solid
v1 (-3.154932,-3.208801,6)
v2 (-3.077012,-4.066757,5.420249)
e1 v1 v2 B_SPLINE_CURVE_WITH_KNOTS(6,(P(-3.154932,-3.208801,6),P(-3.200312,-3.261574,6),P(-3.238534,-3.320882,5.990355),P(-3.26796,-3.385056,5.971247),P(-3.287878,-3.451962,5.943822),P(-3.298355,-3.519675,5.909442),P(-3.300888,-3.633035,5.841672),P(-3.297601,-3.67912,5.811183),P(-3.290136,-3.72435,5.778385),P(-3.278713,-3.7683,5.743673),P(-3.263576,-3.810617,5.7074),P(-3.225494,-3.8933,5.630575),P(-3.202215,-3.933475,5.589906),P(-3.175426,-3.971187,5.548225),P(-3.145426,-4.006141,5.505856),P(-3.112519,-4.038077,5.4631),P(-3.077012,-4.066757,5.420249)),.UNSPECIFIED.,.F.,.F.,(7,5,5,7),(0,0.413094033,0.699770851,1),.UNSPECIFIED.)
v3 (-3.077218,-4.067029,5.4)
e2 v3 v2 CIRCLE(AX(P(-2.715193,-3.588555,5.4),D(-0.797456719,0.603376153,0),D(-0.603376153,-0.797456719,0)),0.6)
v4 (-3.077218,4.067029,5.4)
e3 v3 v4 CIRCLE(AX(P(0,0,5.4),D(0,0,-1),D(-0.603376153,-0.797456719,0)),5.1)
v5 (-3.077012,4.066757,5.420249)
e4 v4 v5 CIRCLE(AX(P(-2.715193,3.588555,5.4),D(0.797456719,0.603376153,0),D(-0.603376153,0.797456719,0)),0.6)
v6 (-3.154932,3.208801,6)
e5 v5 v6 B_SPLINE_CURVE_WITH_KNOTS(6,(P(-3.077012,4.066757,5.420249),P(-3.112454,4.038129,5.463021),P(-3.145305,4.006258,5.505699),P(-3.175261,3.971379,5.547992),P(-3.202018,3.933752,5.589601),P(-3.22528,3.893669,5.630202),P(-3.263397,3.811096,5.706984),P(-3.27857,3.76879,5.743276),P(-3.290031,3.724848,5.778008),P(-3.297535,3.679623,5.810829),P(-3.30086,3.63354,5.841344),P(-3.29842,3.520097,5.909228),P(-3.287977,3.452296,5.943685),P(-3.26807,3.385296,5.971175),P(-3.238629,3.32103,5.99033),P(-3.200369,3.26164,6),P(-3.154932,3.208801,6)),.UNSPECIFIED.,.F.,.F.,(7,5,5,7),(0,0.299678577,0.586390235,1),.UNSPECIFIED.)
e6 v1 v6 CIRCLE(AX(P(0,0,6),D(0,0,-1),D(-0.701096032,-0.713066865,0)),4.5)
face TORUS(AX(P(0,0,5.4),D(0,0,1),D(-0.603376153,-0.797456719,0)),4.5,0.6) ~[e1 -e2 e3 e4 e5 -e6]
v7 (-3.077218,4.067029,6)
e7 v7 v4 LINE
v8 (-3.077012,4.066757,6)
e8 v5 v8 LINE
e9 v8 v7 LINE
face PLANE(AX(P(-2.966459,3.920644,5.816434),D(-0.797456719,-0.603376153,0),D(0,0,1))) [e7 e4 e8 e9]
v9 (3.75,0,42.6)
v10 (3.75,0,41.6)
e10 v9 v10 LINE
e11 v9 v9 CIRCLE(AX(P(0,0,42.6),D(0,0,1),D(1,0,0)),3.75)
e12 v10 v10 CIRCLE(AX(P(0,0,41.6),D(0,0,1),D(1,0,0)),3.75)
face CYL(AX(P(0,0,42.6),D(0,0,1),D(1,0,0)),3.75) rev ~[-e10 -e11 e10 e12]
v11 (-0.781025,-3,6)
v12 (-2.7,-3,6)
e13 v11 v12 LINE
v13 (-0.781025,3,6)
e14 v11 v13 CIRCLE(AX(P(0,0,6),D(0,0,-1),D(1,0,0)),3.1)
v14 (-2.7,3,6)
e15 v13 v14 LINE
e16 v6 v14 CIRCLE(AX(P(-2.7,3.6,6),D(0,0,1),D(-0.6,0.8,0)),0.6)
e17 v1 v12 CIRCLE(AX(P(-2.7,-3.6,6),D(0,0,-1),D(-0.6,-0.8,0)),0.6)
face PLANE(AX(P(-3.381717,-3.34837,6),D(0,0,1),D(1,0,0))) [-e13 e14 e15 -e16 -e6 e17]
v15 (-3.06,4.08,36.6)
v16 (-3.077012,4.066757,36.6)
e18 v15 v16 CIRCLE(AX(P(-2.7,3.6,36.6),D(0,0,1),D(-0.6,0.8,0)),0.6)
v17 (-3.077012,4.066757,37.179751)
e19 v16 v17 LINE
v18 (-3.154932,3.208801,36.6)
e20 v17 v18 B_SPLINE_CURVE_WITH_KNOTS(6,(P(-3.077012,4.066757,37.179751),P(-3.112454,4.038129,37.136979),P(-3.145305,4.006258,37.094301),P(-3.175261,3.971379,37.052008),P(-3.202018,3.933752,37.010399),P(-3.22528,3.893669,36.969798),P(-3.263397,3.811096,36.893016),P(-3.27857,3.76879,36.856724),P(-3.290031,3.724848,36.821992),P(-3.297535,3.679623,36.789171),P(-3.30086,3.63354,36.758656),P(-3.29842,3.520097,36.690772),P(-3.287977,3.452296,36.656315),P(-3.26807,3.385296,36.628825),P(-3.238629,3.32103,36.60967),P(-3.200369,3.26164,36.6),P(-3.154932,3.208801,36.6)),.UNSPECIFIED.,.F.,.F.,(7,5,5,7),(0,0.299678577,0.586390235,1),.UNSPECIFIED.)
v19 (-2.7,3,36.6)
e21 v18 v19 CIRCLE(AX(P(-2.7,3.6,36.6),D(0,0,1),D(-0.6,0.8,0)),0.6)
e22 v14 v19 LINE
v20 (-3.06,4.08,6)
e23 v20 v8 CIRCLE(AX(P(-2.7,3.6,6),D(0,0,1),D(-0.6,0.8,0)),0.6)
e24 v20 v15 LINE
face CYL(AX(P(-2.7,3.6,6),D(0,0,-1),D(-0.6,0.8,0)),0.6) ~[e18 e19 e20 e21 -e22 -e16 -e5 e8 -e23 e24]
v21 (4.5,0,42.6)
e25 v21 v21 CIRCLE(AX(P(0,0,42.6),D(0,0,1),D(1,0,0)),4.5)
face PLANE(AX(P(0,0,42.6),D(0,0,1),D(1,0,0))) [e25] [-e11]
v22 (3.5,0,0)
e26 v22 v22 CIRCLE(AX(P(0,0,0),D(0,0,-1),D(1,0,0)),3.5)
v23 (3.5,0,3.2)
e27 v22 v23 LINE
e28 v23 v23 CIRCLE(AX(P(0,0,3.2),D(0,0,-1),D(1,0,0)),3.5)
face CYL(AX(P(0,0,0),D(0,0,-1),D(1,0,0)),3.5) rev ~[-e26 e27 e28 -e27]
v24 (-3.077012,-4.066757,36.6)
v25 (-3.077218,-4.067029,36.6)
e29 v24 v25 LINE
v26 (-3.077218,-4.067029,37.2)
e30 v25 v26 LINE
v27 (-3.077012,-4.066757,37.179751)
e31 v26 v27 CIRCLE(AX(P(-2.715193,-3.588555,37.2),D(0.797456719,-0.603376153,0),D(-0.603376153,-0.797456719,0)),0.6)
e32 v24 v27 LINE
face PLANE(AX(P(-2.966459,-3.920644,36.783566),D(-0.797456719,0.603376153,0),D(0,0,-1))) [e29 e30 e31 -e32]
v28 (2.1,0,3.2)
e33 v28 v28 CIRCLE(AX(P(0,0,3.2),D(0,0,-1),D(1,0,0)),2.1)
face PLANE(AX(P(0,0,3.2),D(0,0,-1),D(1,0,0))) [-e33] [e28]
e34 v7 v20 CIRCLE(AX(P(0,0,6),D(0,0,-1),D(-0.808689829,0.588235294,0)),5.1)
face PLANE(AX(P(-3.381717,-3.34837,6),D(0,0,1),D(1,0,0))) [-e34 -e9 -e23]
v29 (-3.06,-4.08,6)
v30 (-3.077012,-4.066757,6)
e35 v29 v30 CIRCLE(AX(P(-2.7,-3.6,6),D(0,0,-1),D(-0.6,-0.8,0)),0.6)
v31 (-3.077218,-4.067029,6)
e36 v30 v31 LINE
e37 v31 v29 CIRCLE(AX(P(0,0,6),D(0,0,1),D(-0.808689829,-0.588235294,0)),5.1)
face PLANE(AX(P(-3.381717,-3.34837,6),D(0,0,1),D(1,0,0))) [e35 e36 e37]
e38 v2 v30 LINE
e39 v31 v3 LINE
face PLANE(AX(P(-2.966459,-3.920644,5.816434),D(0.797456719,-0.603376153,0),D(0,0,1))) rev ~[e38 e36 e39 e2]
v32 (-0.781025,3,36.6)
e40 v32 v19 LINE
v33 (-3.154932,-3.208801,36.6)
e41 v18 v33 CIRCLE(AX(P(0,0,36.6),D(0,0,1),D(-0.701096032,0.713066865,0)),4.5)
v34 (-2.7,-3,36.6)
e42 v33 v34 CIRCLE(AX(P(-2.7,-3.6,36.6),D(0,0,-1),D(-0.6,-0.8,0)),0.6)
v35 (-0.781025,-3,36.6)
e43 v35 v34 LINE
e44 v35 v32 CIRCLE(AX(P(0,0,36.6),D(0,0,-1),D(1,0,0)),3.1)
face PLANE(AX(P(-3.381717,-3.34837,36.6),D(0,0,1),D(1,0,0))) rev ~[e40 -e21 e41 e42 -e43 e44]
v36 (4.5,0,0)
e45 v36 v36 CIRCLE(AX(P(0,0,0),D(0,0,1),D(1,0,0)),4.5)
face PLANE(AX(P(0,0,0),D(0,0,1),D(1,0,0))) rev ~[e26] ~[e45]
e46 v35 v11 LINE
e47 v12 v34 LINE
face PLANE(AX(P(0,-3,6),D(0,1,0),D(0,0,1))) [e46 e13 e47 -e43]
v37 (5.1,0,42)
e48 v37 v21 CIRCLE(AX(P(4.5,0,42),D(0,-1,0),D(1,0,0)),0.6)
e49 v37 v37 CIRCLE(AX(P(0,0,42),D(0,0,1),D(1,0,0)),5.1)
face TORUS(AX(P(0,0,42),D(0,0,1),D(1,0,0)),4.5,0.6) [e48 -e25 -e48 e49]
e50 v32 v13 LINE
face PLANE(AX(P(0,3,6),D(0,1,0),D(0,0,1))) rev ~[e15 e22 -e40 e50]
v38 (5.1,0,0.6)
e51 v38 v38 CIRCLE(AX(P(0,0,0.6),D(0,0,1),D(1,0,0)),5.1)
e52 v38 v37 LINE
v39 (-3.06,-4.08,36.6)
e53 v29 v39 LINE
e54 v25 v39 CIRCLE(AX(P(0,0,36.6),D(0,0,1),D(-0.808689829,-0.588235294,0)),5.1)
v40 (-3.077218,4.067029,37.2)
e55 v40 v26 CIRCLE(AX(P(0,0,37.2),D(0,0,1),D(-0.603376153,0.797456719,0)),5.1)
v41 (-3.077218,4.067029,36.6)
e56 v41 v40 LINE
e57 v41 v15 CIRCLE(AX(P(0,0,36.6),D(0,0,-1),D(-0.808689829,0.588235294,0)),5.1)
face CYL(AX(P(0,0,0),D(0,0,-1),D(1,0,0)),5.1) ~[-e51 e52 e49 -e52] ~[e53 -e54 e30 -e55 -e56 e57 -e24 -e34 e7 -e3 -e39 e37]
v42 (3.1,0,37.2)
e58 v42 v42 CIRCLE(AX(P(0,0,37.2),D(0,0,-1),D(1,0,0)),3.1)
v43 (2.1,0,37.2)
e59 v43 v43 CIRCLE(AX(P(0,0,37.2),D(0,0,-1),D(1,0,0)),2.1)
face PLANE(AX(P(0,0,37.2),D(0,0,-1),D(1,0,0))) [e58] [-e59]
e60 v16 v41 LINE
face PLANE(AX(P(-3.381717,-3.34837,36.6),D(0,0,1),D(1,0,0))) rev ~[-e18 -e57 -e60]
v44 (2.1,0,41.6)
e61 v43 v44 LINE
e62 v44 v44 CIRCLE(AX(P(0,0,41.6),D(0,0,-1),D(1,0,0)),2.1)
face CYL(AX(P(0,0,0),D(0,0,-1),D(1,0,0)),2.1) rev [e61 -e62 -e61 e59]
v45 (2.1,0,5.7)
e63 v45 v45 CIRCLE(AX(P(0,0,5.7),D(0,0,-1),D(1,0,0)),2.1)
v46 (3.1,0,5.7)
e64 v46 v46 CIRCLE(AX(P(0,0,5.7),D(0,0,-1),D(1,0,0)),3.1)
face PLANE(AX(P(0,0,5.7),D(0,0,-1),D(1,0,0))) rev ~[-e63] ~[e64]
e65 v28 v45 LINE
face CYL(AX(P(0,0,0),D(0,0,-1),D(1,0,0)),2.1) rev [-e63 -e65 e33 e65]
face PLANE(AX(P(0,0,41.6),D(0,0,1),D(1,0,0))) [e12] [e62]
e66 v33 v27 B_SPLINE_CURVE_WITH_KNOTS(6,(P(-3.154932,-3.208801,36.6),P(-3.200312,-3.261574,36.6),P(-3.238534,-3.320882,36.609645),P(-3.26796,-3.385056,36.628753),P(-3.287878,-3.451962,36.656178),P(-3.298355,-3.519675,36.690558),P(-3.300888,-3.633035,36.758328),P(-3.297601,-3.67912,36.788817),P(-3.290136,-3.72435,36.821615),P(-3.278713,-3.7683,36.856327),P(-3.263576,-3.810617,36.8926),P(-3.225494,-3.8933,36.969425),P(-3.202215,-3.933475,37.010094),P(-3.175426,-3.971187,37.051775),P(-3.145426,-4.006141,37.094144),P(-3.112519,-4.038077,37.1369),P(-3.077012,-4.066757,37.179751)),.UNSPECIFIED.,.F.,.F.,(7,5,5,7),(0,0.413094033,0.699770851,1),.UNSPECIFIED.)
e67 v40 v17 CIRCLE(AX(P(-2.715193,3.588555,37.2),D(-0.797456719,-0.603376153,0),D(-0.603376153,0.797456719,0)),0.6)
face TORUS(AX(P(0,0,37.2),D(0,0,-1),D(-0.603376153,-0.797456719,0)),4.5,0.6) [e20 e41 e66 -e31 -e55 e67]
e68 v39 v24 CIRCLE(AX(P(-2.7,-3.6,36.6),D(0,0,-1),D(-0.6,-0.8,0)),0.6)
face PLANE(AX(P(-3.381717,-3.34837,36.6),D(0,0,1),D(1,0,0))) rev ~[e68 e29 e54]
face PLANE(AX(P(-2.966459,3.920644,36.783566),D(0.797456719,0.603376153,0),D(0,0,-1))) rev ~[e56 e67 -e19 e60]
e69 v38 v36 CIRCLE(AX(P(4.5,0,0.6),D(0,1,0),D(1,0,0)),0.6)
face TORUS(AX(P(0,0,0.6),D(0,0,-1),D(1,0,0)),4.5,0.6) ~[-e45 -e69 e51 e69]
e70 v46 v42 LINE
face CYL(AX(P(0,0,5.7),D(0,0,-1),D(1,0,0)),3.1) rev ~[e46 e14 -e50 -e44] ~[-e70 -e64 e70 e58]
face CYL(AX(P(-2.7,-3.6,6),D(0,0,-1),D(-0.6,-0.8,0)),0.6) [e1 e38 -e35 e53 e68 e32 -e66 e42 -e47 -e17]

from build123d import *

# Parameters (mm, degrees)
F0_R          = 5.1
F0_R_2        = 2.1
F1_DEPTH      = 42.6
F2_R          = 3.5
F3_DEPTH      = 3.2
F4_R          = 3.75
F5_DEPTH      = 1
F6_W          = 6
F6_H          = 30.6
F7_DEPTH      = 25
F9_START      = -2.5
F8_R          = 3.1
F9_DEPTH      = 31.5
F10_T1_DEPTH  = 30.6
F10_T10_ANGLE = 105.7758372511
F10_T16_ANGLE = 105.7758372511
F10_T23_DEPTH = 34.3907560857
F10_T27_ANGLE = 105.7758372511
F10_T34_ANGLE = 105.7758372511
F10_T38_DEPTH = 34.3907560857
F10_T45_DEPTH = 34.3907560857
F10_T49_ANGLE = 105.7758372511
F10_T56_DEPTH = 34.3907560857
F10_T60_ANGLE = 105.7758372511


# Not quite as in the source:
# - a fillet or chamfer that OpenCascade refuses, or shapes differently, is made with other operations: its cross-section is extruded or revolved along the edge and cut away or added


with BuildPart() as f1:
    # F0 (on Top) → F1 (new body)
    with BuildSketch(Plane.XY):
        Circle(F0_R)
        Circle(F0_R_2, mode=Mode.SUBTRACT)
    extrude(amount=F1_DEPTH)

    # F2 (on face) → F3 (cut)
    with BuildSketch(Plane(origin=(0, 0, 0), x_dir=(1, 0, 0), z_dir=(0, 0, -1))):
        Circle(F2_R)
    extrude(amount=-F3_DEPTH, mode=Mode.SUBTRACT)

    # F4 (on face) → F5 (cut)
    with BuildSketch(Plane.XY.offset(42.6)):
        Circle(F4_R)
    extrude(amount=-F5_DEPTH, mode=Mode.SUBTRACT)

    # F6 (on Right) → F7 (cut)
    with BuildSketch(Plane.YZ):
        with Locations((0, 21.3)):
            Rectangle(F6_W, F6_H)
    extrude(amount=-F7_DEPTH, mode=Mode.SUBTRACT)

    # F8 (on face) → F9 (cut)
    with BuildSketch(Plane(origin=(0, 0, 3.2), x_dir=(1, 0, 0), z_dir=(0, 0, -1)).offset(F9_START)):
        Circle(F8_R)
    extrude(amount=-F9_DEPTH, mode=Mode.SUBTRACT)

    # F10: fillet of radius 0.6 on 6 edges, made by hand

    # F10_s2 → F10_t1 (cut)
    with BuildSketch(Plane.XY.offset(6)):
        with BuildLine():
            ThreePointArc((-3.06, 4.08), (-3.2692099788, 3.4102633404), (-2.7, 3))
            Line((-2.7, 3), (-4.1243181255, 3))
            ThreePointArc((-4.1243181255, 3), (-3.6325207132, 3.5797755891), (-3.06, 4.08))
        make_face()
        with BuildLine():
            ThreePointArc((-3.06, -4.08), (-3.2692099788, -3.4102633404), (-2.7, -3))
            Line((-2.7, -3), (-4.1243181255, -3))
            ThreePointArc((-4.1243181255, -3), (-3.6325207132, -3.5797755891), (-3.06, -4.08))
        make_face()
    extrude(amount=F10_T1_DEPTH, mode=Mode.SUBTRACT)

    # F10_s3 → F10_t4 (revolve, cut)
    with BuildSketch(Plane.XZ):
        with BuildLine():
            ThreePointArc((5.1, 42), (4.9242640687, 42.4242640687), (4.5, 42.6))
            Line((4.5, 42.6), (5.1, 42.6))
            Line((5.1, 42.6), (5.1, 42))
        make_face()
    revolve(axis=Axis((0, 0, 42.6), (0, 0, 1)), mode=Mode.SUBTRACT)

    # F10_s5 → F10_t6 (revolve, cut)
    with BuildSketch(Plane.XZ):
        with BuildLine():
            ThreePointArc((5.1, 0.6), (4.9242640687, 0.1757359313), (4.5, 0))
            Line((4.5, 0), (5.1, 0))
            Line((5.1, 0), (5.1, 0.6))
        make_face()
    revolve(axis=Axis((0, 0, 0), (0, 0, 1)), mode=Mode.SUBTRACT)


with BuildPart() as f10_tool8:
    # F10_s9 → F10_t10 (revolve)
    with BuildSketch(Plane(origin=(0, 0, 0), x_dir=(0, 0, 1), z_dir=(0.7974567188, -0.6033761527, 0))):
        with BuildLine():
            ThreePointArc((5.4, 5.1), (5.8242640687, 4.9242640687), (6, 4.5))
            Line((6, 4.5), (6, 5.1))
            Line((6, 5.1), (5.4, 5.1))
        make_face()
    revolve(axis=Axis((0, 0, 6), (0, 0, -1)), revolution_arc=F10_T10_ANGLE)

    split(bisect_by=Plane.XZ.offset(3), keep=Keep.BOTTOM)

    split(bisect_by=Plane.XZ.offset(-3), keep=Keep.TOP)


with BuildPart() as f1_1:
    add(f1.part)

    # F10_t7: cut F10_tool8
    add(f10_tool8.part, mode=Mode.SUBTRACT)


with BuildPart() as f10_tool14:
    # F10_s15 → F10_t16 (revolve)
    with BuildSketch(Plane(origin=(0, 0, 0), x_dir=(0, 0, 1), z_dir=(0.7974567188, -0.6033761527, 0))):
        with BuildLine():
            ThreePointArc((37.2, 5.1), (36.7757359313, 4.9242640687), (36.6, 4.5))
            Line((36.6, 4.5), (36.6, 5.1))
            Line((36.6, 5.1), (37.2, 5.1))
        make_face()
    revolve(axis=Axis((0, 0, 36.6), (0, 0, -1)), revolution_arc=F10_T16_ANGLE)

    split(bisect_by=Plane.XZ.offset(3), keep=Keep.BOTTOM)

    split(bisect_by=Plane.XZ.offset(-3), keep=Keep.TOP)


with BuildPart() as f1_2:
    add(f1_1.part)

    # F10_t13: cut F10_tool14
    add(f10_tool14.part, mode=Mode.SUBTRACT)


with BuildPart() as f10_tool21:
    # F10_s22 → F10_t23 (new body)
    with BuildSketch(Plane.XY.offset(36.6)):
        with BuildLine():
            ThreePointArc((-3.06, -4.08), (-3.2692099788, -3.4102633404), (-2.7, -3))
            Line((-2.7, -3), (-4.1243181255, -3))
            ThreePointArc((-4.1243181255, -3), (-3.6325207132, -3.5797755891), (-3.06, -4.08))
        make_face()
    extrude(amount=-F10_T23_DEPTH)

    split(bisect_by=Plane.XY.offset(6), keep=Keep.BOTTOM)


with BuildPart() as f10_tool25:
    # F10_s26 → F10_t27 (revolve)
    with BuildSketch(Plane(origin=(0, 0, 0), x_dir=(0, 0, 1), z_dir=(0.7974567188, -0.6033761527, 0))):
        with BuildLine():
            ThreePointArc((5.4, 5.1), (5.8242640687, 4.9242640687), (6, 4.5))
            Line((6, 4.5), (6, 5.1))
            Line((6, 5.1), (5.4, 5.1))
        make_face()
    revolve(axis=Axis((0, 0, 6), (0, 0, -1)), revolution_arc=F10_T27_ANGLE)

    split(bisect_by=Plane.XZ.offset(3), keep=Keep.TOP)


with BuildPart() as f10_tool21_1:
    add(f10_tool21.part)

    # F10_t29: intersect F10_tool25
    add(f10_tool25.part, mode=Mode.INTERSECT)


with BuildPart() as f1_3:
    add(f1_2.part)

    # F10_t19: cut F10_tool21
    add(f10_tool21_1.part, mode=Mode.SUBTRACT)


with BuildPart() as f10_tool32:
    # F10_s33 → F10_t34 (revolve)
    with BuildSketch(Plane(origin=(0, 0, 0), x_dir=(0, 0, 1), z_dir=(0.7974567188, -0.6033761527, 0))):
        with BuildLine():
            ThreePointArc((5.4, 5.1), (5.8242640687, 4.9242640687), (6, 4.5))
            Line((6, 4.5), (6, 5.1))
            Line((6, 5.1), (5.4, 5.1))
        make_face()
    revolve(axis=Axis((0, 0, 6), (0, 0, -1)), revolution_arc=F10_T34_ANGLE)

    split(bisect_by=Plane.XZ.offset(-3), keep=Keep.BOTTOM)


with BuildPart() as f10_tool36:
    # F10_s37 → F10_t38 (new body)
    with BuildSketch(Plane.XY.offset(36.6)):
        with BuildLine():
            ThreePointArc((-3.06, 4.08), (-3.2692099788, 3.4102633404), (-2.7, 3))
            Line((-2.7, 3), (-4.1243181255, 3))
            ThreePointArc((-4.1243181255, 3), (-3.6325207132, 3.5797755891), (-3.06, 4.08))
        make_face()
    extrude(amount=-F10_T38_DEPTH)

    split(bisect_by=Plane.XY.offset(6), keep=Keep.BOTTOM)


with BuildPart() as f10_tool32_1:
    add(f10_tool32.part)

    # F10_t40: intersect F10_tool36
    add(f10_tool36.part, mode=Mode.INTERSECT)


with BuildPart() as f1_4:
    add(f1_3.part)

    # F10_t30: cut F10_tool32
    add(f10_tool32_1.part, mode=Mode.SUBTRACT)


with BuildPart() as f10_tool43:
    # F10_s44 → F10_t45 (new body)
    with BuildSketch(Plane.XY.offset(40.3907560857)):
        with BuildLine():
            ThreePointArc((-3.06, 4.08), (-3.2692099788, 3.4102633404), (-2.7, 3))
            Line((-2.7, 3), (-4.1243181255, 3))
            ThreePointArc((-4.1243181255, 3), (-3.6325207132, 3.5797755891), (-3.06, 4.08))
        make_face()
    extrude(amount=-F10_T45_DEPTH)

    split(bisect_by=Plane.XY.offset(36.6), keep=Keep.TOP)


with BuildPart() as f10_tool47:
    # F10_s48 → F10_t49 (revolve)
    with BuildSketch(Plane(origin=(0, 0, 0), x_dir=(0, 0, 1), z_dir=(0.7974567188, -0.6033761527, 0))):
        with BuildLine():
            ThreePointArc((37.2, 5.1), (36.7757359313, 4.9242640687), (36.6, 4.5))
            Line((36.6, 4.5), (36.6, 5.1))
            Line((36.6, 5.1), (37.2, 5.1))
        make_face()
    revolve(axis=Axis((0, 0, 36.6), (0, 0, -1)), revolution_arc=F10_T49_ANGLE)

    split(bisect_by=Plane.XZ.offset(-3), keep=Keep.BOTTOM)


with BuildPart() as f10_tool43_1:
    add(f10_tool43.part)

    # F10_t51: intersect F10_tool47
    add(f10_tool47.part, mode=Mode.INTERSECT)


with BuildPart() as f1_5:
    add(f1_4.part)

    # F10_t41: cut F10_tool43
    add(f10_tool43_1.part, mode=Mode.SUBTRACT)


with BuildPart() as f10_tool54:
    # F10_s55 → F10_t56 (new body)
    with BuildSketch(Plane.XY.offset(40.3907560857)):
        with BuildLine():
            ThreePointArc((-3.06, -4.08), (-3.2692099788, -3.4102633404), (-2.7, -3))
            Line((-2.7, -3), (-4.1243181255, -3))
            ThreePointArc((-4.1243181255, -3), (-3.6325207132, -3.5797755891), (-3.06, -4.08))
        make_face()
    extrude(amount=-F10_T56_DEPTH)

    split(bisect_by=Plane.XY.offset(36.6), keep=Keep.TOP)


with BuildPart() as f10_tool58:
    # F10_s59 → F10_t60 (revolve)
    with BuildSketch(Plane(origin=(0, 0, 0), x_dir=(0, 0, 1), z_dir=(0.7974567188, -0.6033761527, 0))):
        with BuildLine():
            ThreePointArc((37.2, 5.1), (36.7757359313, 4.9242640687), (36.6, 4.5))
            Line((36.6, 4.5), (36.6, 5.1))
            Line((36.6, 5.1), (37.2, 5.1))
        make_face()
    revolve(axis=Axis((0, 0, 36.6), (0, 0, -1)), revolution_arc=F10_T60_ANGLE)

    split(bisect_by=Plane.XZ.offset(3), keep=Keep.TOP)


with BuildPart() as f10_tool54_1:
    add(f10_tool54.part)

    # F10_t62: intersect F10_tool58
    add(f10_tool58.part, mode=Mode.INTERSECT)


with BuildPart() as f1_6:
    add(f1_5.part)

    # F10_t52: cut F10_tool54
    add(f10_tool54_1.part, mode=Mode.SUBTRACT)


solid = f1_6.part
